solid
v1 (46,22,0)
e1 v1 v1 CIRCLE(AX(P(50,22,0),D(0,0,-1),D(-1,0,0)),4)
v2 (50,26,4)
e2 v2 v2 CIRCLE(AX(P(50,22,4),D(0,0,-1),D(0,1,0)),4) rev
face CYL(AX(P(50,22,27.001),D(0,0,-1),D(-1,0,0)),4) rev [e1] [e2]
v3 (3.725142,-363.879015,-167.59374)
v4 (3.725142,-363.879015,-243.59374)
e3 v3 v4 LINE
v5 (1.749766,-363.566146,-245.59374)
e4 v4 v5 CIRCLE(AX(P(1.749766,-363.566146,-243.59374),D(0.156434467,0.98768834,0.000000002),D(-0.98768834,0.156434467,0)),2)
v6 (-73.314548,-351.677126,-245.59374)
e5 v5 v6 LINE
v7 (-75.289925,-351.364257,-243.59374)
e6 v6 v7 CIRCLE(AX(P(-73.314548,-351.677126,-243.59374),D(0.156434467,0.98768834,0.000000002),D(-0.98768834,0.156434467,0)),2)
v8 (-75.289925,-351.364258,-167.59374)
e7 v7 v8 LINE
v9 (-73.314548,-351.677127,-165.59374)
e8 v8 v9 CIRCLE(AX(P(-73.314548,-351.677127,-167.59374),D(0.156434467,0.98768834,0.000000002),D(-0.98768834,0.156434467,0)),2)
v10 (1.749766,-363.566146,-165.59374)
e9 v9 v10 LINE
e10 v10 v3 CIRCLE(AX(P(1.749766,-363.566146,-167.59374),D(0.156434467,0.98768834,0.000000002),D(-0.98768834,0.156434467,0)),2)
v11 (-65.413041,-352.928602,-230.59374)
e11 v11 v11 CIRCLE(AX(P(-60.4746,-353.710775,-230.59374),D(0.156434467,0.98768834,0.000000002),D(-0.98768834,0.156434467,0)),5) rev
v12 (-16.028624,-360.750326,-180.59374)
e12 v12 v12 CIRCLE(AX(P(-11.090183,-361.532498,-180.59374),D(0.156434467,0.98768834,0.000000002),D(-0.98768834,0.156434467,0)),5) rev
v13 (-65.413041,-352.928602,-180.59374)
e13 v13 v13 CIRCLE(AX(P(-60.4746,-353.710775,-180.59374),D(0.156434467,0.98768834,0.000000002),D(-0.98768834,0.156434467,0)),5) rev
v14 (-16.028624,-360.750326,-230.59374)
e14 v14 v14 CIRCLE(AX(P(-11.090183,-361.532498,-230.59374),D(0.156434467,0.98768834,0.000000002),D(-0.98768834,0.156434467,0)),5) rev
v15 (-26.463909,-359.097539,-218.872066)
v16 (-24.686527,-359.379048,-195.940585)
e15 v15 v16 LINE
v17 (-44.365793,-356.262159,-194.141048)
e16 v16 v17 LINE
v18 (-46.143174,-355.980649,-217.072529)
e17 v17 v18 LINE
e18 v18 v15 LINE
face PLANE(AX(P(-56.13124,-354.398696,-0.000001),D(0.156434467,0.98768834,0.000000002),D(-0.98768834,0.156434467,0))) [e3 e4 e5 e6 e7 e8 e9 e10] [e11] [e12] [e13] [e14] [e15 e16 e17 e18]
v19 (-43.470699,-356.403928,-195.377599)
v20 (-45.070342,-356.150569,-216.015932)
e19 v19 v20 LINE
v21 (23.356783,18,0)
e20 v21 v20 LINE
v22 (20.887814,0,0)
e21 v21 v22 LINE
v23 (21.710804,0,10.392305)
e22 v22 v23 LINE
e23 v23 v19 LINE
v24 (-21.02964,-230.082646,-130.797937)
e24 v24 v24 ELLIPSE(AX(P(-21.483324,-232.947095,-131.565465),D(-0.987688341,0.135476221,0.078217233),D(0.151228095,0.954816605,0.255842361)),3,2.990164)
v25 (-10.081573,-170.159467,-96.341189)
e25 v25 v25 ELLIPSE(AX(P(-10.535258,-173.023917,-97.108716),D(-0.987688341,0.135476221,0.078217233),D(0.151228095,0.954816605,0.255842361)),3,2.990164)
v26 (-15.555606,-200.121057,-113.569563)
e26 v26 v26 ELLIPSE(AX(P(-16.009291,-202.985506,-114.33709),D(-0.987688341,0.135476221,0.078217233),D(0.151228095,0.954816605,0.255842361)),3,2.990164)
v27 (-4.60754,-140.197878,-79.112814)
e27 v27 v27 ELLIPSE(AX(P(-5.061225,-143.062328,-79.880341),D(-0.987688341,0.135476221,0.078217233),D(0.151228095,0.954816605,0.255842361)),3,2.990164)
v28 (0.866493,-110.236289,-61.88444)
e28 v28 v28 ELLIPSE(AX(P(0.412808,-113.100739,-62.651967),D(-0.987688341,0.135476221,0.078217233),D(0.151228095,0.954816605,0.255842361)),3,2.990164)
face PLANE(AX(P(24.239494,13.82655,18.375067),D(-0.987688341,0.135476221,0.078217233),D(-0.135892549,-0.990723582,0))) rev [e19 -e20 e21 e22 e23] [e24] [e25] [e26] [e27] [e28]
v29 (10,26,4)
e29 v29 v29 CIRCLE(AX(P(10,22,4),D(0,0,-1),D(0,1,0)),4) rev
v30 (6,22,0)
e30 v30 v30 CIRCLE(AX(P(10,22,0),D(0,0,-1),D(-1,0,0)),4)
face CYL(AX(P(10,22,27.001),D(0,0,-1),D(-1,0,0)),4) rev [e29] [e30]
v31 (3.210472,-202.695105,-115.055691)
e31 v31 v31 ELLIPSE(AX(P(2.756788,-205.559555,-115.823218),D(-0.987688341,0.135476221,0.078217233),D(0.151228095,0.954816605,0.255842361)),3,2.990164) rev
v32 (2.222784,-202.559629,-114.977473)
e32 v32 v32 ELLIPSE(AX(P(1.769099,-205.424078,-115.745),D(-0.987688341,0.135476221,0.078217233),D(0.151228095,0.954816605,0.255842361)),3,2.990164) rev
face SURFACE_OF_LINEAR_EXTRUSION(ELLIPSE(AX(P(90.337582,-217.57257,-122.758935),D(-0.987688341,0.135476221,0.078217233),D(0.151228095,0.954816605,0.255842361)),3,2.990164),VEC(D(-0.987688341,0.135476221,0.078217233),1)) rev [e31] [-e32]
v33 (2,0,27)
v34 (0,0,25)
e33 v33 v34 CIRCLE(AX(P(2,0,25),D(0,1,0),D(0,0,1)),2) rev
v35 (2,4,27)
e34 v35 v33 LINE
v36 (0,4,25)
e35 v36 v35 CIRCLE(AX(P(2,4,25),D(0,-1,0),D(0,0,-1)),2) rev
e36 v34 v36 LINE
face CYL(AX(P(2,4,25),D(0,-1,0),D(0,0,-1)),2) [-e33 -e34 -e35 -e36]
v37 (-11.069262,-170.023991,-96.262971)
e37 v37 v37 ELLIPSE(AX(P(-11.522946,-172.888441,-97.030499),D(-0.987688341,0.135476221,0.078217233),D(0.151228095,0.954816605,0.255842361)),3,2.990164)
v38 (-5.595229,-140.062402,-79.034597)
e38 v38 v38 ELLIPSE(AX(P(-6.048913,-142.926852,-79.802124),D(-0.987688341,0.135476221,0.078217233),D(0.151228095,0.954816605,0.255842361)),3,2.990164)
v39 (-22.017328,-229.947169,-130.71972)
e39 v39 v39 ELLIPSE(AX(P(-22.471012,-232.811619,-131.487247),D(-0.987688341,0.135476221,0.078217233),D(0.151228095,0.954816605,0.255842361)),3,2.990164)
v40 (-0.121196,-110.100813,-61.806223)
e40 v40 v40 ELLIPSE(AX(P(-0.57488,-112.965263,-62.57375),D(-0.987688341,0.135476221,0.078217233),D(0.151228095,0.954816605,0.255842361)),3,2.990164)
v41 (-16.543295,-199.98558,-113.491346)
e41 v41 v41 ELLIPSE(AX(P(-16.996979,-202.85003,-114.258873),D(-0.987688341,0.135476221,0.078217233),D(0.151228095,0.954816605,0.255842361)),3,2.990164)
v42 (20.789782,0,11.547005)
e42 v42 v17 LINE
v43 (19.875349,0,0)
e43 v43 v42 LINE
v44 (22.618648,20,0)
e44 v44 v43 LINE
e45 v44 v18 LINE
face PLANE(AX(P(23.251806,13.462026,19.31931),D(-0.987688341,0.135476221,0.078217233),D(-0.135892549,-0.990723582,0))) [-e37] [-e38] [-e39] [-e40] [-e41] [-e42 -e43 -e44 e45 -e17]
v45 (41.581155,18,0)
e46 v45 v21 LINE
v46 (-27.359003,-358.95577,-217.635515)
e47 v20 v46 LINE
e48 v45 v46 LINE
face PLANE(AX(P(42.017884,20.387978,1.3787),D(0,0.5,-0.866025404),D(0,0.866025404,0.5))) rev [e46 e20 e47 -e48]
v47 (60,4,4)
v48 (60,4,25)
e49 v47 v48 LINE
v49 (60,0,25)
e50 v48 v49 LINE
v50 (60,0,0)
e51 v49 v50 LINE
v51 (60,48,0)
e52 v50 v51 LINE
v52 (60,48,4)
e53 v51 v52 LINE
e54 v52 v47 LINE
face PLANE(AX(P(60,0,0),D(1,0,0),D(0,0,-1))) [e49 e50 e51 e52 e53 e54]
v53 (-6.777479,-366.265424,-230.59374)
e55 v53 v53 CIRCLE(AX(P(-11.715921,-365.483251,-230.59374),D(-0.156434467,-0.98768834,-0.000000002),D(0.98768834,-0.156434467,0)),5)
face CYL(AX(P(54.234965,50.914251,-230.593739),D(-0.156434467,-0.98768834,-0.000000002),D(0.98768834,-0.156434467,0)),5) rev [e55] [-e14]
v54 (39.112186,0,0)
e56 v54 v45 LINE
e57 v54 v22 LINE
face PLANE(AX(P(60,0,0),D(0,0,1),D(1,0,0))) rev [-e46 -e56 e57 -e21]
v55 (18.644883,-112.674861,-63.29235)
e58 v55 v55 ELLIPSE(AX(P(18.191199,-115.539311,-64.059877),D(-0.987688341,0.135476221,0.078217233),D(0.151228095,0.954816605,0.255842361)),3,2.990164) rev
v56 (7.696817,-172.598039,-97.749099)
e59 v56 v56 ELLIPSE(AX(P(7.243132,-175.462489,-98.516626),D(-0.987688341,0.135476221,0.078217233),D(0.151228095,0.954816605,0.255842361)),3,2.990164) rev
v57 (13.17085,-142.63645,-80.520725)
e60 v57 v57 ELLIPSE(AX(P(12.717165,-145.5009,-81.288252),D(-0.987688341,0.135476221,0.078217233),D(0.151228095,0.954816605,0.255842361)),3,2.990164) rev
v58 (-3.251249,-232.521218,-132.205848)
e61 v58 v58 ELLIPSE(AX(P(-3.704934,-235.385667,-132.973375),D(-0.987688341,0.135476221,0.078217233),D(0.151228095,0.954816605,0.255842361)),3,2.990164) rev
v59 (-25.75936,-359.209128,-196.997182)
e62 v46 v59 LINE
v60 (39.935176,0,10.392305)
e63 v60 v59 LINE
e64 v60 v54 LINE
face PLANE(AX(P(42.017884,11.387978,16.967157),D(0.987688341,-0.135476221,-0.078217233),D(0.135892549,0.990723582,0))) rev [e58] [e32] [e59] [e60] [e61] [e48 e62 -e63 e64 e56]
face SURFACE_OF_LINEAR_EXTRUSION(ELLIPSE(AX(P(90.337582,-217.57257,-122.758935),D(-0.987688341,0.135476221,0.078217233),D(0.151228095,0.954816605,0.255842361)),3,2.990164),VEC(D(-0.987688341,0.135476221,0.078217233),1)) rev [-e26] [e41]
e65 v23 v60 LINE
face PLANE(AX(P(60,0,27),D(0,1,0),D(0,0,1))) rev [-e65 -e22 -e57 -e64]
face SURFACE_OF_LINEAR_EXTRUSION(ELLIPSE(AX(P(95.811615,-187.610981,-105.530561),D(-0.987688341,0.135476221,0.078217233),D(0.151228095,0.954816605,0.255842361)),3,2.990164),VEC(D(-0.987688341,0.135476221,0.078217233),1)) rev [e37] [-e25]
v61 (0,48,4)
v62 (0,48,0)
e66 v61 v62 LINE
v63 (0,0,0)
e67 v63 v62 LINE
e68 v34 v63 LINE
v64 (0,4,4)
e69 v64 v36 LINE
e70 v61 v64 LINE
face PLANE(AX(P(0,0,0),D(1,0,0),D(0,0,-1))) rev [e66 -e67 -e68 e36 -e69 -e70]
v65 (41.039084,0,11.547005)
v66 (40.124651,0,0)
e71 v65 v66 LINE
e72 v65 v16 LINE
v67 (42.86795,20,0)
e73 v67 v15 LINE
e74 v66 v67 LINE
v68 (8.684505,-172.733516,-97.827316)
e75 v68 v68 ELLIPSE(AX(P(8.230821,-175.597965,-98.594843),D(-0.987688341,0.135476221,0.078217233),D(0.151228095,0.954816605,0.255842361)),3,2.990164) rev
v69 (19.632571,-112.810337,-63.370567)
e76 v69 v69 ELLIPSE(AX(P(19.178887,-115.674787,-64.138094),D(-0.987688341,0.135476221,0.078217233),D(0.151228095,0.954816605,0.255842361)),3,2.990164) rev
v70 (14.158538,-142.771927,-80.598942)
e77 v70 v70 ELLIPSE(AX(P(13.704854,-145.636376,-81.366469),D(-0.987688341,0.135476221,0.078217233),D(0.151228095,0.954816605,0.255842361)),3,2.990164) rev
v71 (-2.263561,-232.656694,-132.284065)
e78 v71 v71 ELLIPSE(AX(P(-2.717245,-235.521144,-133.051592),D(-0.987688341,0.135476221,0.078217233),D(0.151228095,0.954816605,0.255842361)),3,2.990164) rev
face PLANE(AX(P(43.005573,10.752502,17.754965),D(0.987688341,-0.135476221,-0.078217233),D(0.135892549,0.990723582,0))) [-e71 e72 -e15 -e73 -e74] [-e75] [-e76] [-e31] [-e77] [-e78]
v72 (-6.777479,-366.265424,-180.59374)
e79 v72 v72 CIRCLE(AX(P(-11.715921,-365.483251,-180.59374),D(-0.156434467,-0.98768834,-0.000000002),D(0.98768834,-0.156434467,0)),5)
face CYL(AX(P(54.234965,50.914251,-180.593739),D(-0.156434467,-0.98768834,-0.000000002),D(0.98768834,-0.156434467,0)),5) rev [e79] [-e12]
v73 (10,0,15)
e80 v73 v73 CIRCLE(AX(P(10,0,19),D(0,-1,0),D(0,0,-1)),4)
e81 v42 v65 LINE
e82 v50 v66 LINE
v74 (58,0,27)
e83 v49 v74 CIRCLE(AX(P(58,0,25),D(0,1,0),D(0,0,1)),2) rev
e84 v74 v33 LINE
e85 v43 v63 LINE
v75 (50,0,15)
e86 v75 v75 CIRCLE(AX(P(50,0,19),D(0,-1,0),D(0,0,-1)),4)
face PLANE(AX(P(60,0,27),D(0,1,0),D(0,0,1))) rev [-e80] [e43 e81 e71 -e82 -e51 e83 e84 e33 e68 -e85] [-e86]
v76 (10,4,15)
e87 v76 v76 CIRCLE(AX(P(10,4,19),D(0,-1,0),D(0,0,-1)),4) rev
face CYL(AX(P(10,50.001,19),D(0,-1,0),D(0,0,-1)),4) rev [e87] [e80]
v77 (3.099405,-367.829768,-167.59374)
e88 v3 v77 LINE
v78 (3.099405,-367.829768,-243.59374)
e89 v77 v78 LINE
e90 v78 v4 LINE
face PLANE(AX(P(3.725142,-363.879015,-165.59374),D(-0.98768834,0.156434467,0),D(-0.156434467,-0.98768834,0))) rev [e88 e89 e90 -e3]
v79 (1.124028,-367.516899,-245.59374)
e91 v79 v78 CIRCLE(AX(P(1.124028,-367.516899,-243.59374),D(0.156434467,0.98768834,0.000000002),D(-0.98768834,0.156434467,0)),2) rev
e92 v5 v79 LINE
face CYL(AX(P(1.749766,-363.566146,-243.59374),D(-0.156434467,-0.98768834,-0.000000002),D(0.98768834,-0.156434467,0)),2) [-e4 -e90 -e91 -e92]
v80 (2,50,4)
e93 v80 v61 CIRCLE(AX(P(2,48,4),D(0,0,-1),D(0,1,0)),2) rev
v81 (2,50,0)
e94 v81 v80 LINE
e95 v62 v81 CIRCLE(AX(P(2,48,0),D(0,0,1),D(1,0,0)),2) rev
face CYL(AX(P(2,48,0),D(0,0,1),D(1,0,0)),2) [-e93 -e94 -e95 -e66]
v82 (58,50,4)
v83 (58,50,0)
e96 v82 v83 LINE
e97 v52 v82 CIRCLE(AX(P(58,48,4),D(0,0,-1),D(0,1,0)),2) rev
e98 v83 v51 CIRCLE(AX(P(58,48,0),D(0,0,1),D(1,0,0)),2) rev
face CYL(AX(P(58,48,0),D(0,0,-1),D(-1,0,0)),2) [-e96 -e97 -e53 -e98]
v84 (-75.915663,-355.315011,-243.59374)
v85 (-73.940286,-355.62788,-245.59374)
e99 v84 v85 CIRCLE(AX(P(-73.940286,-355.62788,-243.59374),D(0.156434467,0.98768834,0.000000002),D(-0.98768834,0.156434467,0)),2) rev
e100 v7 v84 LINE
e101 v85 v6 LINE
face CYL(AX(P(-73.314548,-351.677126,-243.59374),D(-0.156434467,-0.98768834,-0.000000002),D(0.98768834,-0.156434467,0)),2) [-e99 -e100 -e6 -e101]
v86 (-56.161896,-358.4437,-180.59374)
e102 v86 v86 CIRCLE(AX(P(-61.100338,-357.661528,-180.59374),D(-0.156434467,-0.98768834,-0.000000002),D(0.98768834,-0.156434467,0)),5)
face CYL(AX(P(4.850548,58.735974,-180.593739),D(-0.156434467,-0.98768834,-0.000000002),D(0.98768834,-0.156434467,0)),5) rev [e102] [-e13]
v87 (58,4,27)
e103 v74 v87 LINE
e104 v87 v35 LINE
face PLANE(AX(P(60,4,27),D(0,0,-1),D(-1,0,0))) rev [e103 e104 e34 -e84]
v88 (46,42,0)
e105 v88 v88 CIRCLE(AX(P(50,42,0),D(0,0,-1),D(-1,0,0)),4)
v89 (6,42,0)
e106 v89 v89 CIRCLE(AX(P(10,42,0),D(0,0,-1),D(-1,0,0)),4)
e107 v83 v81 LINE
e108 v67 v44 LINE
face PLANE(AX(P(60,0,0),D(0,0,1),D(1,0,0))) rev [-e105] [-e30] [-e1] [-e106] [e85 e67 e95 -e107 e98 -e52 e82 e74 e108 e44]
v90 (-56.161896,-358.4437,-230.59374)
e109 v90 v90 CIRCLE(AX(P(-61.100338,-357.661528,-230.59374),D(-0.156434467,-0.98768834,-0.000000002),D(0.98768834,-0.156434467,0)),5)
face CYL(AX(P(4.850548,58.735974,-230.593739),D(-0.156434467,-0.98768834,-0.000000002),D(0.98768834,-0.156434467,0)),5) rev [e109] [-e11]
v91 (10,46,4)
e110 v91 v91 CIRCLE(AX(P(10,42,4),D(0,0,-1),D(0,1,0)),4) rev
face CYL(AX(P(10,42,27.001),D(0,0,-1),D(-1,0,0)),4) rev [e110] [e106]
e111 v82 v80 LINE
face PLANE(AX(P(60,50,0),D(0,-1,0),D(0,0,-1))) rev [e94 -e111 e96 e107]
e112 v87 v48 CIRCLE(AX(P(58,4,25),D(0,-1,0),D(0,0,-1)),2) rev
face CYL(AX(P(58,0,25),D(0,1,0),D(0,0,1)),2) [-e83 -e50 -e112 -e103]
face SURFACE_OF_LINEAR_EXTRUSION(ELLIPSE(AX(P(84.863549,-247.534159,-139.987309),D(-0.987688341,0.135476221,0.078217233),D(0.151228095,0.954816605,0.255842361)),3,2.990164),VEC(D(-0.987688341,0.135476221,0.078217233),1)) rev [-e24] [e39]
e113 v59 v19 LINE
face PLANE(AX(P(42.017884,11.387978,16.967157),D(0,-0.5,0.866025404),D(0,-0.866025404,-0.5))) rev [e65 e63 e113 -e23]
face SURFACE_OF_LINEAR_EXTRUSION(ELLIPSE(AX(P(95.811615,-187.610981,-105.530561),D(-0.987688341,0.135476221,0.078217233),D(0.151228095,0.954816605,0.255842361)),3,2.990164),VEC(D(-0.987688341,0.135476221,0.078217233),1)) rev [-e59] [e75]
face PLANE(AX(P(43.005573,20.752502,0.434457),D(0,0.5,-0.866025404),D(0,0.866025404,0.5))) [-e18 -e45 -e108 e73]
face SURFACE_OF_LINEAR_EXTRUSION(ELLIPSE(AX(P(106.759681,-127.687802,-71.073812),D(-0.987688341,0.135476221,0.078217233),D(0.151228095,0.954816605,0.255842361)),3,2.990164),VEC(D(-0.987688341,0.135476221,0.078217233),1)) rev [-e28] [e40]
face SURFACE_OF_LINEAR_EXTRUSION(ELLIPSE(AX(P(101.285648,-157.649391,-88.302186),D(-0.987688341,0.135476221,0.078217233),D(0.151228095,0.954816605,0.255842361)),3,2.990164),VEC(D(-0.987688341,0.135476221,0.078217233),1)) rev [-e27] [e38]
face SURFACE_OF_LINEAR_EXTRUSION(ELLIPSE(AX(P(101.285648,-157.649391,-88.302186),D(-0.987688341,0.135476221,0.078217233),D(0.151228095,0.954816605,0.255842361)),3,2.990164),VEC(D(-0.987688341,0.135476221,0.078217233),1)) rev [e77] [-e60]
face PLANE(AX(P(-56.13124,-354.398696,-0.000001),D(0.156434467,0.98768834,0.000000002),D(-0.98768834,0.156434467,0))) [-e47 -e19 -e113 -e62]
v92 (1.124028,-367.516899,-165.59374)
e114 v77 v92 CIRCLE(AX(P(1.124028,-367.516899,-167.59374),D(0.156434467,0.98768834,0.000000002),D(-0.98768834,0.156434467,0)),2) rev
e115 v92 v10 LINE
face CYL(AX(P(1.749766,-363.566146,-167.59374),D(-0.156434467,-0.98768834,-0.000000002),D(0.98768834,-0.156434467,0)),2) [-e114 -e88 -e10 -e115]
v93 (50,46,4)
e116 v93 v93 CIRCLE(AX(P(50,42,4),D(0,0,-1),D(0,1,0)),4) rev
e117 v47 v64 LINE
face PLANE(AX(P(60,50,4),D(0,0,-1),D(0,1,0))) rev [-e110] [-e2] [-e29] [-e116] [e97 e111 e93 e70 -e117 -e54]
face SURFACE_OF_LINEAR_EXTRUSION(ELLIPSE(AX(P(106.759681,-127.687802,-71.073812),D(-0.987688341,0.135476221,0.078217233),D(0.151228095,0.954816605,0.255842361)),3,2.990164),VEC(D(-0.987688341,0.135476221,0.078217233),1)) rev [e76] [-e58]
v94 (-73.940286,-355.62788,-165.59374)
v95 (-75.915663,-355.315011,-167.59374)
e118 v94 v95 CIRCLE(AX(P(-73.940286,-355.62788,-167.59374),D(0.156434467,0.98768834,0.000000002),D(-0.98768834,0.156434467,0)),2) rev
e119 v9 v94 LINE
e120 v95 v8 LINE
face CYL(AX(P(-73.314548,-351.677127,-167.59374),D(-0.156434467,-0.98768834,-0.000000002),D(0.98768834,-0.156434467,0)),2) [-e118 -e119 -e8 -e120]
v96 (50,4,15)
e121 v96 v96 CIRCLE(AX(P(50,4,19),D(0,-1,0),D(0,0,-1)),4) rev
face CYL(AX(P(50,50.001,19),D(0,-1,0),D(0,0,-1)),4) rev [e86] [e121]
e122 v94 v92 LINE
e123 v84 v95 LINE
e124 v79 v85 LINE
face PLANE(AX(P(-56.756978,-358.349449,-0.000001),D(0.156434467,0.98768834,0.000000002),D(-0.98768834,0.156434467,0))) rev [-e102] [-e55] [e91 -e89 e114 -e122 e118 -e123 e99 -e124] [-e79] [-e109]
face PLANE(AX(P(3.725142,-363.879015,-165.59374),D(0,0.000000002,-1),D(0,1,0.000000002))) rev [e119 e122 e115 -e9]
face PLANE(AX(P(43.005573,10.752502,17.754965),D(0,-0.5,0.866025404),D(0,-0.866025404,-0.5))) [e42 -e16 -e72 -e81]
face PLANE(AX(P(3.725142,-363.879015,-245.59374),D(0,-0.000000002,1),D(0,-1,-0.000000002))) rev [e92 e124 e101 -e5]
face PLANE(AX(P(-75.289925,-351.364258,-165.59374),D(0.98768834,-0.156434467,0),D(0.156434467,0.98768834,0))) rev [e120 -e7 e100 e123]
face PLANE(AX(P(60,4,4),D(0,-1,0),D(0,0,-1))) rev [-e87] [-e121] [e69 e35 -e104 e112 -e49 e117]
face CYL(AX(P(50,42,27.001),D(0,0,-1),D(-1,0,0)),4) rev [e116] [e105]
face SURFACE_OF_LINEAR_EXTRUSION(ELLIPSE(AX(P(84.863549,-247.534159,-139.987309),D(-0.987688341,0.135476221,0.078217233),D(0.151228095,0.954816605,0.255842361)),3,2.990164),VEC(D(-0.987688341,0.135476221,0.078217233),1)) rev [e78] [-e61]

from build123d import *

# Parameters (mm, degrees)
BOSS_EXTRUDE1_DEPTH      = 60
BOSS_EXTRUDE2_DEPTH      = 500
BOSS_EXTRUDE2_DEPTH_BACK = 20
SKETCH3_W                = 20
SKETCH3_H                = 20
SKETCH3_W_2              = 18
SKETCH3_H_2              = 18
CUT_EXTRUDE1_DEPTH       = 60
SKETCH7_W                = 80
SKETCH7_H                = 80
BOSS_EXTRUDE3_DEPTH      = 4
SKETCH8_W                = 96.387466959
SKETCH8_H                = 104.058165024
CUT_EXTRUDE3_DEPTH       = 100
CUT_EXTRUDE4_REACH       = 450.752
SKETCH9_R                = 3.999999996
CUT_EXTRUDE5_REACH       = 450.752
SKETCH10_R               = 4.000000003
CUT_EXTRUDE6_REACH       = 492.61
SKETCH11_R               = 5
FILLET1_R                = 2
FILLET2_R                = 2
SKETCH12_RX              = 3
SKETCH12_RY              = 2.990164225
CUT_EXTRUDE7_DEPTH       = 450.440488821


with BuildPart() as part:
    # Sketch1 → Boss-Extrude1 (new body)
    with BuildSketch(Plane(origin=(0, 0, 0), x_dir=(0, 0, -1), z_dir=(1, 0, 0))):
        Polygon((0, 0), (0, 50), (-4, 50), (-4, 4), (-27, 4), (-27, 0), align=None)
    extrude(amount=BOSS_EXTRUDE1_DEPTH)

    # Sketch3 → Boss-Extrude2 (add, two sides: drawn at the far end of the back side and taken through both)
    with BuildSketch(Plane(origin=(0.734152256, 4.01424851, 2.317627458), x_dir=(0, -0.49999999999998884, 0.866025403784445), z_dir=(-0.1564344650402179, -0.8553631939770945, -0.4938441702975589)).offset(-BOSS_EXTRUDE2_DEPTH_BACK)):
        with Locations((0, -29.630650218)):
            Rectangle(SKETCH3_W, SKETCH3_H)
        with Locations((0, -29.630650218)):
            Rectangle(SKETCH3_W_2, SKETCH3_H_2, mode=Mode.SUBTRACT)
    extrude(amount=BOSS_EXTRUDE2_DEPTH + BOSS_EXTRUDE2_DEPTH_BACK)

    # Sketch5 → Cut-Extrude1 (cut)
    with BuildSketch(Plane.ZY):
        Polygon((4, 4), (4, 36.054903459), (38.781358344, 4), align=None)
    extrude(amount=-CUT_EXTRUDE1_DEPTH, mode=Mode.SUBTRACT)

    # Sketch7 → Boss-Extrude3 (add)
    with BuildSketch(Plane(origin=(-56.75697757, -358.349448921, -6.04e-07), x_dir=(0.9876883403131397, -0.15643446682069614, -2.6345369953248584e-10), z_dir=(0.15643446682069614, 0.9876883403131398, 1.6633811750632153e-09))):
        with Locations((20.602499468, 205.593738915)):
            Rectangle(SKETCH7_W, SKETCH7_H)
    extrude(amount=BOSS_EXTRUDE3_DEPTH)

    # Sketch8 → Cut-Extrude3 (cut)
    with BuildSketch(Plane(origin=(-56.75697757, -358.349448921, -6.04e-07), x_dir=(0.9876883403131398, -0.15643446682069642, -2.6345368640035017e-10), z_dir=(-0.15643446682069642, -0.9876883403131398, -1.6633810921501747e-09))):
        with Locations((22.720042887, -232.311236701)):
            Rectangle(SKETCH8_W, SKETCH8_H)
    extrude(amount=CUT_EXTRUDE3_DEPTH, mode=Mode.SUBTRACT)

    # Sketch9 → Cut-Extrude4 (cut, up to next)
    with BuildSketch(Plane(origin=(0, 0, 0), x_dir=(-1, 0, 0), z_dir=(0, 0, -1)), mode=Mode.PRIVATE) as cut_extrude4_sk1:
        with Locations((-50, 22)):
            Circle(SKETCH9_R)
    cut_extrude4_tool1 = extrude(cut_extrude4_sk1.sketch, amount=-CUT_EXTRUDE4_REACH, mode=Mode.PRIVATE) & part.part
    # Sketch9 → Cut-Extrude4 (cut, up to next)
    with BuildSketch(Plane(origin=(0, 0, 0), x_dir=(-1, 0, 0), z_dir=(0, 0, -1)), mode=Mode.PRIVATE) as cut_extrude4_sk2:
        with Locations((-10, 22)):
            Circle(SKETCH9_R)
    cut_extrude4_tool2 = extrude(cut_extrude4_sk2.sketch, amount=-CUT_EXTRUDE4_REACH, mode=Mode.PRIVATE) & part.part
    # Sketch9 → Cut-Extrude4 (cut, up to next)
    with BuildSketch(Plane(origin=(0, 0, 0), x_dir=(-1, 0, 0), z_dir=(0, 0, -1)), mode=Mode.PRIVATE) as cut_extrude4_sk3:
        with Locations((-10, 42)):
            Circle(SKETCH9_R)
    cut_extrude4_tool3 = extrude(cut_extrude4_sk3.sketch, amount=-CUT_EXTRUDE4_REACH, mode=Mode.PRIVATE) & part.part
    # Sketch9 → Cut-Extrude4 (cut, up to next)
    with BuildSketch(Plane(origin=(0, 0, 0), x_dir=(-1, 0, 0), z_dir=(0, 0, -1)), mode=Mode.PRIVATE) as cut_extrude4_sk4:
        with Locations((-50, 42)):
            Circle(SKETCH9_R)
    cut_extrude4_tool4 = extrude(cut_extrude4_sk4.sketch, amount=-CUT_EXTRUDE4_REACH, mode=Mode.PRIVATE) & part.part
    add(cut_extrude4_tool1.solids().sort_by_distance((50, 22, 0))[0], mode=Mode.SUBTRACT)
    add(cut_extrude4_tool2.solids().sort_by_distance((10, 22, 0))[0], mode=Mode.SUBTRACT)
    add(cut_extrude4_tool3.solids().sort_by_distance((10, 42, 0))[0], mode=Mode.SUBTRACT)
    add(cut_extrude4_tool4.solids().sort_by_distance((50, 42, 0))[0], mode=Mode.SUBTRACT)

    # Sketch10 → Cut-Extrude5 (cut, up to next)
    with BuildSketch(Plane.XZ, mode=Mode.PRIVATE) as cut_extrude5_sk1:
        with Locations(Location((50, 19, 0), (0, 0, 270))):
            Circle(SKETCH10_R)
    cut_extrude5_tool1 = extrude(cut_extrude5_sk1.sketch, amount=-CUT_EXTRUDE5_REACH, mode=Mode.PRIVATE) & part.part
    # Sketch10 → Cut-Extrude5 (cut, up to next)
    with BuildSketch(Plane.XZ, mode=Mode.PRIVATE) as cut_extrude5_sk2:
        with Locations(Location((10, 19, 0), (0, 0, 270))):
            Circle(SKETCH10_R)
    cut_extrude5_tool2 = extrude(cut_extrude5_sk2.sketch, amount=-CUT_EXTRUDE5_REACH, mode=Mode.PRIVATE) & part.part
    add(cut_extrude5_tool1.solids().sort_by_distance((50, 0, 19))[0], mode=Mode.SUBTRACT)
    add(cut_extrude5_tool2.solids().sort_by_distance((10, 0, 19))[0], mode=Mode.SUBTRACT)

    # Sketch11 → Cut-Extrude6 (cut, up to next)
    with BuildSketch(Plane(origin=(-56.75697757, -358.349448921, -6.04e-07), x_dir=(0.9876883403131398, -0.15643446682069645, -2.634536864003504e-10), z_dir=(-0.15643446682069645, -0.9876883403131398, -1.6633810921501756e-09)), mode=Mode.PRIVATE) as cut_extrude6_sk1:
        with Locations((-4.397500532, -180.593738915)):
            Circle(SKETCH11_R)
    cut_extrude6_tool1 = extrude(cut_extrude6_sk1.sketch, amount=-CUT_EXTRUDE6_REACH, mode=Mode.PRIVATE) & part.part
    # Sketch11 → Cut-Extrude6 (cut, up to next)
    with BuildSketch(Plane(origin=(-56.75697757, -358.349448921, -6.04e-07), x_dir=(0.9876883403131398, -0.15643446682069645, -2.634536864003504e-10), z_dir=(-0.15643446682069645, -0.9876883403131398, -1.6633810921501756e-09)), mode=Mode.PRIVATE) as cut_extrude6_sk2:
        with Locations((45.602499468, -180.593738915)):
            Circle(SKETCH11_R)
    cut_extrude6_tool2 = extrude(cut_extrude6_sk2.sketch, amount=-CUT_EXTRUDE6_REACH, mode=Mode.PRIVATE) & part.part
    # Sketch11 → Cut-Extrude6 (cut, up to next)
    with BuildSketch(Plane(origin=(-56.75697757, -358.349448921, -6.04e-07), x_dir=(0.9876883403131398, -0.15643446682069645, -2.634536864003504e-10), z_dir=(-0.15643446682069645, -0.9876883403131398, -1.6633810921501756e-09)), mode=Mode.PRIVATE) as cut_extrude6_sk3:
        with Locations((45.602499468, -230.593738915)):
            Circle(SKETCH11_R)
    cut_extrude6_tool3 = extrude(cut_extrude6_sk3.sketch, amount=-CUT_EXTRUDE6_REACH, mode=Mode.PRIVATE) & part.part
    # Sketch11 → Cut-Extrude6 (cut, up to next)
    with BuildSketch(Plane(origin=(-56.75697757, -358.349448921, -6.04e-07), x_dir=(0.9876883403131398, -0.15643446682069645, -2.634536864003504e-10), z_dir=(-0.15643446682069645, -0.9876883403131398, -1.6633810921501756e-09)), mode=Mode.PRIVATE) as cut_extrude6_sk4:
        with Locations((-4.397500532, -230.593738915)):
            Circle(SKETCH11_R)
    cut_extrude6_tool4 = extrude(cut_extrude6_sk4.sketch, amount=-CUT_EXTRUDE6_REACH, mode=Mode.PRIVATE) & part.part
    add(cut_extrude6_tool1.solids().sort_by_distance((-61.100338, -357.661528, -180.59374))[0], mode=Mode.SUBTRACT)
    add(cut_extrude6_tool2.solids().sort_by_distance((-11.715921, -365.483251, -180.59374))[0], mode=Mode.SUBTRACT)
    add(cut_extrude6_tool3.solids().sort_by_distance((-11.715921, -365.483251, -230.59374))[0], mode=Mode.SUBTRACT)
    add(cut_extrude6_tool4.solids().sort_by_distance((-61.100338, -357.661528, -230.59374))[0], mode=Mode.SUBTRACT)

    # Fillet1
    fillet1_edges = [part.edges().sort_by_distance(p)[0] for p in [
        (60, 50, 2),
        (60, 2, 27),
        (0, 2, 27),
        (0, 50, 2),
    ]]
    fillet(fillet1_edges, radius=FILLET1_R)

    # Fillet2
    # the kernel refuses this fillet: 2 mm, written as the material it takes off along each edge
    with BuildSketch(Plane(origin=(-76.697835011, -360.253452555, -245.593739522), x_dir=(2.0026115353614065e-15, -1.6841157483071222e-09, 1.0), z_dir=(0.15643446682069614, 0.9876883403131398, 1.6633811750632153e-09)), Plane(origin=(-76.697835011, -360.25345269, -165.593739522), x_dir=(0.9876883403131398, -0.15643446682069614, -2.634550355651499e-10), z_dir=(0.15643446682069614, 0.9876883403131398, 1.6633811750632153e-09))) as fillet2_piece_1:
        with BuildLine():
            CenterArc((FILLET2_R, FILLET2_R), FILLET2_R, 180, 90)
            Line((0, FILLET2_R), (0, 0))
            Line((0, 0), (FILLET2_R, 0))
        make_face()
    extrude(amount=14, mode=Mode.SUBTRACT)
    with BuildSketch(Plane(origin=(2.317232214, -372.768210036, -165.593739543), x_dir=(-0.9876883403131398, 0.15643446682069614, 2.634550355651978e-10), z_dir=(0.15643446682069614, 0.9876883403131398, 1.6633811750632153e-09)), Plane(origin=(2.317232214, -372.768209901, -245.593739543), x_dir=(3.518887041216593e-15, -1.6841159884615724e-09, 1.0), z_dir=(0.15643446682069614, 0.9876883403131398, 1.6633811750632153e-09))) as fillet2_piece_2:
        with BuildLine():
            CenterArc((FILLET2_R, -FILLET2_R), FILLET2_R, 90, 90)
            Line((0, -FILLET2_R), (0, 0))
            Line((0, 0), (FILLET2_R, 0))
        make_face()
    extrude(amount=14, mode=Mode.SUBTRACT)

    # Sketch12 → Cut-Extrude7 (cut, through all)
    with BuildSketch(Plane(origin=(19.388964338, -2.659486302, -1.535455133), x_dir=(0.07749165674017042, -0.01062913913579635, 0.9969363392598826), z_dir=(-0.9876883405951398, 0.13547622075225838, 0.0782172325201072))):
        with Locations(Location((-61.225870001, -111.995471629), (0, 0, 75.129892126))):
            Ellipse(SKETCH12_RX, SKETCH12_RY)
        with Locations(Location((-78.507188468, -142.423004822), (0, 0, 75.129892126))):
            Ellipse(SKETCH12_RX, SKETCH12_RY)
        with Locations(Location((-95.788506935, -172.850538016), (0, 0, 75.129892126))):
            Ellipse(SKETCH12_RX, SKETCH12_RY)
        with Locations(Location((-113.069825401, -203.278071209), (0, 0, 75.129892126))):
            Ellipse(SKETCH12_RX, SKETCH12_RY)
        with Locations(Location((-130.351143868, -233.705604403), (0, 0, 75.129892126))):
            Ellipse(SKETCH12_RX, SKETCH12_RY)
    extrude(amount=-CUT_EXTRUDE7_DEPTH, mode=Mode.SUBTRACT)


solid = part.part
